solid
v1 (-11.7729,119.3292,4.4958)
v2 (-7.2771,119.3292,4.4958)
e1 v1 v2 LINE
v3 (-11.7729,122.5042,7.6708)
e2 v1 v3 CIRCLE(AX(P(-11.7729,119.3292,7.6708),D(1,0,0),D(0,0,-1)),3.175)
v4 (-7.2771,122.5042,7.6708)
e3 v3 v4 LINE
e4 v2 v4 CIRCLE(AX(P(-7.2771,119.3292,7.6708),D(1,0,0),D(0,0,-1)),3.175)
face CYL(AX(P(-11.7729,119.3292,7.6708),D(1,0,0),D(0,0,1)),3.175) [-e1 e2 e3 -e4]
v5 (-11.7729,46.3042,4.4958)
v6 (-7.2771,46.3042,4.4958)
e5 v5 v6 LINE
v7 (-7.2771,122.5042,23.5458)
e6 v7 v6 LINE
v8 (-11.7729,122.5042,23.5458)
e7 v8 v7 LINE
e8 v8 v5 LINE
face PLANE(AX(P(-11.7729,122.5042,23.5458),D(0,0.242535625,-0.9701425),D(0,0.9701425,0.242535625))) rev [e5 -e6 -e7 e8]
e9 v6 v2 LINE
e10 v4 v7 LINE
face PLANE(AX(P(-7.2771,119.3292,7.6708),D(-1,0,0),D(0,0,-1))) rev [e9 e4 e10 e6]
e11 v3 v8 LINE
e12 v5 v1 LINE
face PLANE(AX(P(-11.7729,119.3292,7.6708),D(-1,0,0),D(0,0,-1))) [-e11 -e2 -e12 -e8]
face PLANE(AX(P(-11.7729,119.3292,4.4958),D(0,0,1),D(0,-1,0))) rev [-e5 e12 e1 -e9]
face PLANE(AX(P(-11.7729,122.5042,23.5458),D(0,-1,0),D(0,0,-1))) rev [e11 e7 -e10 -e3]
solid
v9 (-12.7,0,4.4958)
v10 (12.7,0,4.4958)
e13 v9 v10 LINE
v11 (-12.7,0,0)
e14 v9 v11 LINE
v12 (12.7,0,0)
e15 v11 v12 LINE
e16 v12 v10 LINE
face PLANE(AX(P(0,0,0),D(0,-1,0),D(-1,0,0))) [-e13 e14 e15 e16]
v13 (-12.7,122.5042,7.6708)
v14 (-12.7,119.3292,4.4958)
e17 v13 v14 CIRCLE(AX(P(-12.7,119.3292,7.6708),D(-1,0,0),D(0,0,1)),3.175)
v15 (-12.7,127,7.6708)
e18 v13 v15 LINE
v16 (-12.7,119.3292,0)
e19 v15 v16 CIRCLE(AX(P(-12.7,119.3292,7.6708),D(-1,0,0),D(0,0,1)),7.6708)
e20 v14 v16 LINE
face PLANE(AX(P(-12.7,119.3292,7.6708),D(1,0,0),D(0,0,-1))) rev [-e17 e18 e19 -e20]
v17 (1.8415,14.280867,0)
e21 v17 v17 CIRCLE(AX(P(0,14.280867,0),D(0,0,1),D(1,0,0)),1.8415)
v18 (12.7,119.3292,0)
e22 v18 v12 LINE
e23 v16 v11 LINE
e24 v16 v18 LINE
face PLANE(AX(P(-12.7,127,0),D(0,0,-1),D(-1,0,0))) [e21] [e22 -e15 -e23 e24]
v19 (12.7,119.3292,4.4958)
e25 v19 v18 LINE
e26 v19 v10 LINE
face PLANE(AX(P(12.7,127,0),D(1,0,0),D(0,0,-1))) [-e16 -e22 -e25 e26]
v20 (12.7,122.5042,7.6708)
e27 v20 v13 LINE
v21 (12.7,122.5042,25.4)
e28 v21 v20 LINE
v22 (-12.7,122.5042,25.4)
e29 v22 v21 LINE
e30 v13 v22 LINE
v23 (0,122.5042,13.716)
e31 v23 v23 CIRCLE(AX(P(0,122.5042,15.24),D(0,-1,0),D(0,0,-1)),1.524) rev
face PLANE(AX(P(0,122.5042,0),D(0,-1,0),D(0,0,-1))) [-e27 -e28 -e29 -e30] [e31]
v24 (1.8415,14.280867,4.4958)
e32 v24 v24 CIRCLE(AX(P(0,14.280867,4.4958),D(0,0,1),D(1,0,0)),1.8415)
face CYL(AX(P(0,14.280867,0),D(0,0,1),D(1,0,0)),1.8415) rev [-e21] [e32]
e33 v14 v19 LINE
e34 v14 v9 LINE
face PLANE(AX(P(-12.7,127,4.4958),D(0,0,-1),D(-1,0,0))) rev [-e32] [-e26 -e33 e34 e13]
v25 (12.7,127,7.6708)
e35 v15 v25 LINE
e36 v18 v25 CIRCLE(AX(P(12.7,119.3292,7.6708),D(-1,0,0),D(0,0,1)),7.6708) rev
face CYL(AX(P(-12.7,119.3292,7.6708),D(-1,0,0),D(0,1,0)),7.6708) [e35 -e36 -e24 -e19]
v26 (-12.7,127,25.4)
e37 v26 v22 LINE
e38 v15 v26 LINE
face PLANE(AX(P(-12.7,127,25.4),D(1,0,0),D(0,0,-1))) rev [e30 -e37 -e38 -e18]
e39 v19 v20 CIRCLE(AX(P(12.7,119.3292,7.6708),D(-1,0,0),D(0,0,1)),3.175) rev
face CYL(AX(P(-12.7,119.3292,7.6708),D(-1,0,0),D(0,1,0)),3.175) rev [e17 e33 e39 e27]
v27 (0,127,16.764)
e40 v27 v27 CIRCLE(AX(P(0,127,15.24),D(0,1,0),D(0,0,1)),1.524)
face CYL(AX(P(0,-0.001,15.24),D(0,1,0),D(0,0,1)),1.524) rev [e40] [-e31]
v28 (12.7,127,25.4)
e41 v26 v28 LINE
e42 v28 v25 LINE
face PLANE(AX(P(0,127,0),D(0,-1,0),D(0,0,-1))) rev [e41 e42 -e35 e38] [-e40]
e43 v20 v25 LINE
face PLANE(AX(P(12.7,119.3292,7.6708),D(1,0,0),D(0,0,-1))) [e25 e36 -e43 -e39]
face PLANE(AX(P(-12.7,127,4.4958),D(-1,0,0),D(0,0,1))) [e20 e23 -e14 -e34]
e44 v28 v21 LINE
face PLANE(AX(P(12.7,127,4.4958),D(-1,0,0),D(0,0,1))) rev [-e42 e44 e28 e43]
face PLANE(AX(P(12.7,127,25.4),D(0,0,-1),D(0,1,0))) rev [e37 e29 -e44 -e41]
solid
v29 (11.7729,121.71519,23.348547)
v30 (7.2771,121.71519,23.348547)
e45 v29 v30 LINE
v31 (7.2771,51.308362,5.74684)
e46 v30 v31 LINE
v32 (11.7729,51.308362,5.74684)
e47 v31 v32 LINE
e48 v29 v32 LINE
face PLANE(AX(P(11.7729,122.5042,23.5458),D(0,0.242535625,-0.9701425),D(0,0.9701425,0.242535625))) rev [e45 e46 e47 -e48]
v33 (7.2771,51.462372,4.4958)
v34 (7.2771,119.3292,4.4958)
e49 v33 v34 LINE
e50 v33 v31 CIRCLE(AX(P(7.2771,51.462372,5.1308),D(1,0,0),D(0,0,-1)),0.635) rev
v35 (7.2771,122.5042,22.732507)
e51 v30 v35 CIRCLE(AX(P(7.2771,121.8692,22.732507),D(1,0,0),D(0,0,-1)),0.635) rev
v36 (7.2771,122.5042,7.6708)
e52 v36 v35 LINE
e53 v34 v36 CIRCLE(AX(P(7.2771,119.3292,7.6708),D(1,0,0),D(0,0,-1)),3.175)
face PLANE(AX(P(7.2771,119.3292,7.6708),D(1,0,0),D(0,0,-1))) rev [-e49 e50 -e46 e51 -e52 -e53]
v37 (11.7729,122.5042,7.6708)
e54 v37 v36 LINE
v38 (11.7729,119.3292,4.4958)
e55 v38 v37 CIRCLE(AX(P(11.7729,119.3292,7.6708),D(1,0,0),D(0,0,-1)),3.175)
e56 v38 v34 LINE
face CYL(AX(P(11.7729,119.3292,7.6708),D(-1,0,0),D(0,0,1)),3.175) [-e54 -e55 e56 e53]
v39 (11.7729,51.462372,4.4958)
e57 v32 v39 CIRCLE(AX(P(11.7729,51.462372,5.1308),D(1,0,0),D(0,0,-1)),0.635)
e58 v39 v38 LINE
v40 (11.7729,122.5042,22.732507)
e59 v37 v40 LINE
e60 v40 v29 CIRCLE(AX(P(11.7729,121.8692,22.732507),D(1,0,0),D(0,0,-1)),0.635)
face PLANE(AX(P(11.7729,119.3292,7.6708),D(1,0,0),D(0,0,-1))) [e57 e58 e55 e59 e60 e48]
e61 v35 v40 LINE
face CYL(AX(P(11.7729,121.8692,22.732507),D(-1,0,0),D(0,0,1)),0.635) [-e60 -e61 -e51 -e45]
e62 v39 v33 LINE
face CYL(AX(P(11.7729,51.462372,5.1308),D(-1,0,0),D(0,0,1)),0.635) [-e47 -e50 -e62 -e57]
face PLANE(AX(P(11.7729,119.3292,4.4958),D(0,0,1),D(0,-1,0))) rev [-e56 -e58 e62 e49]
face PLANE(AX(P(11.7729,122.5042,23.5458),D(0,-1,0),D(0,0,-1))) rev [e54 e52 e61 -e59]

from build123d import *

# Parameters (mm, degrees)
SKETCH2_W                    = 25.4
SKETCH2_H                    = 4.4958
BASE_FLANGE1_DEPTH           = 127
EDGE_FLANGE1_STRIP_W         = 24.3332
EDGE_FLANGE1_STRIP_H         = 4.4958
EDGE_FLANGE1_STRIP_CUT_DEPTH = 25.4
EDGE_FLANGE1_DEPTH           = 25.4
CUT_EXTRUDE1_REACH           = 132.136
SKETCH10_R                   = 1.524
SKETCH11_R                   = 1.8415
CUT_EXTRUDE2_DEPTH           = 130.333969156
BOSS_EXTRUDE1_START          = 9.525
BOSS_EXTRUDE1_DEPTH          = 2.2479
FILLET1_R                    = 0.635


# Sheet-metal steps are written as plain solids
with BuildPart() as part:
    # Sketch2 → Base-Flange1 (new body)
    with BuildSketch(Plane(origin=(0, 0, 0), x_dir=(1, 0, 0), z_dir=(0, 1, 0))):
        with Locations((0, -2.2479)):
            Rectangle(SKETCH2_W, SKETCH2_H)
    extrude(amount=BASE_FLANGE1_DEPTH)

    # Edge-Flange1 strip (across the edge) → Edge-Flange1 strip cut (cut)
    with BuildSketch(Plane(origin=(12.7, 127, 4.4958), x_dir=(0, -1, 0), z_dir=(-1, 0, 0))):
        with Locations((-4.4958, -2.2479)):
            Rectangle(EDGE_FLANGE1_STRIP_W, EDGE_FLANGE1_STRIP_H)
    extrude(amount=EDGE_FLANGE1_STRIP_CUT_DEPTH, mode=Mode.SUBTRACT)

    # Edge-Flange1 section (across the edge) → Edge-Flange1 (add)
    with BuildSketch(Plane(origin=(12.7, 127, 4.4958), x_dir=(0, -1, 0), z_dir=(-1, 0, 0))):
        with BuildLine():
            Line((0, 3.175), (0, 20.9042))
            Line((0, 20.9042), (4.4958, 20.9042))
            Line((4.4958, 20.9042), (4.4958, 3.175))
            ThreePointArc((4.4958, 3.175), (5.42573597, 0.92993597), (7.6708, 0))
            Line((7.6708, 0), (7.6708, -4.4958))
            ThreePointArc((7.6708, -4.4958), (2.246725303, -2.249074697), (0, 3.175))
        make_face()
    extrude(amount=EDGE_FLANGE1_DEPTH)

    # Sketch10 → Cut-Extrude1 (cut, up to next)
    with BuildSketch(Plane(origin=(0, 127, 0), x_dir=(1, 0, 0), z_dir=(0, 1, 0)), mode=Mode.PRIVATE) as cut_extrude1_sk1:
        with Locations(Location((0, -15.24, 0), (0, 0, 270))):
            Circle(SKETCH10_R)
    cut_extrude1_tool1 = extrude(cut_extrude1_sk1.sketch, amount=-CUT_EXTRUDE1_REACH, mode=Mode.PRIVATE) & part.part
    add(cut_extrude1_tool1.solids().sort_by_distance((0, 127, 15.24))[0], mode=Mode.SUBTRACT)

    # Sketch11 → Cut-Extrude2 (cut, through all)
    with BuildSketch(Plane.XY.offset(4.4958)):
        with Locations((0, 14.280866767)):
            Circle(SKETCH11_R)
    extrude(amount=-CUT_EXTRUDE2_DEPTH, mode=Mode.SUBTRACT)


with BuildPart() as body_2:
    # Sketch12 → Boss-Extrude1 (new, symmetric)
    with BuildSketch(Plane(origin=(0, 0, 0), x_dir=(0, 0, -1), z_dir=(1, 0, 0)).offset(BOSS_EXTRUDE1_START)):
        with BuildLine():
            Line((-23.5458, 122.5042), (-4.4958, 46.3042))
            Line((-4.4958, 46.3042), (-4.4958, 119.3292))
            ThreePointArc((-4.4958, 119.3292), (-5.42573597, 121.57426403), (-7.6708, 122.5042))
            Line((-7.6708, 122.5042), (-23.5458, 122.5042))
        make_face()
    extrude(amount=BOSS_EXTRUDE1_DEPTH, both=True)


with BuildPart() as body_3:
    # Mirror2: mirrored copy
    add(body_2.part.mirror(Plane(origin=(0, 0, 0), x_dir=(0, 0, 1), z_dir=(1, 0, 0))))


with BuildPart() as body_2_1:
    add(body_2.part)

    # Fillet1
    fillet1_edges = [body_2_1.edges().sort_by_distance(p)[0] for p in [
        (9.525, 46.3042, 4.4958),
        (9.525, 122.5042, 23.5458),
    ]]
    fillet(fillet1_edges, radius=FILLET1_R)


solid = Compound([part.part, body_3.part, body_2_1.part])
